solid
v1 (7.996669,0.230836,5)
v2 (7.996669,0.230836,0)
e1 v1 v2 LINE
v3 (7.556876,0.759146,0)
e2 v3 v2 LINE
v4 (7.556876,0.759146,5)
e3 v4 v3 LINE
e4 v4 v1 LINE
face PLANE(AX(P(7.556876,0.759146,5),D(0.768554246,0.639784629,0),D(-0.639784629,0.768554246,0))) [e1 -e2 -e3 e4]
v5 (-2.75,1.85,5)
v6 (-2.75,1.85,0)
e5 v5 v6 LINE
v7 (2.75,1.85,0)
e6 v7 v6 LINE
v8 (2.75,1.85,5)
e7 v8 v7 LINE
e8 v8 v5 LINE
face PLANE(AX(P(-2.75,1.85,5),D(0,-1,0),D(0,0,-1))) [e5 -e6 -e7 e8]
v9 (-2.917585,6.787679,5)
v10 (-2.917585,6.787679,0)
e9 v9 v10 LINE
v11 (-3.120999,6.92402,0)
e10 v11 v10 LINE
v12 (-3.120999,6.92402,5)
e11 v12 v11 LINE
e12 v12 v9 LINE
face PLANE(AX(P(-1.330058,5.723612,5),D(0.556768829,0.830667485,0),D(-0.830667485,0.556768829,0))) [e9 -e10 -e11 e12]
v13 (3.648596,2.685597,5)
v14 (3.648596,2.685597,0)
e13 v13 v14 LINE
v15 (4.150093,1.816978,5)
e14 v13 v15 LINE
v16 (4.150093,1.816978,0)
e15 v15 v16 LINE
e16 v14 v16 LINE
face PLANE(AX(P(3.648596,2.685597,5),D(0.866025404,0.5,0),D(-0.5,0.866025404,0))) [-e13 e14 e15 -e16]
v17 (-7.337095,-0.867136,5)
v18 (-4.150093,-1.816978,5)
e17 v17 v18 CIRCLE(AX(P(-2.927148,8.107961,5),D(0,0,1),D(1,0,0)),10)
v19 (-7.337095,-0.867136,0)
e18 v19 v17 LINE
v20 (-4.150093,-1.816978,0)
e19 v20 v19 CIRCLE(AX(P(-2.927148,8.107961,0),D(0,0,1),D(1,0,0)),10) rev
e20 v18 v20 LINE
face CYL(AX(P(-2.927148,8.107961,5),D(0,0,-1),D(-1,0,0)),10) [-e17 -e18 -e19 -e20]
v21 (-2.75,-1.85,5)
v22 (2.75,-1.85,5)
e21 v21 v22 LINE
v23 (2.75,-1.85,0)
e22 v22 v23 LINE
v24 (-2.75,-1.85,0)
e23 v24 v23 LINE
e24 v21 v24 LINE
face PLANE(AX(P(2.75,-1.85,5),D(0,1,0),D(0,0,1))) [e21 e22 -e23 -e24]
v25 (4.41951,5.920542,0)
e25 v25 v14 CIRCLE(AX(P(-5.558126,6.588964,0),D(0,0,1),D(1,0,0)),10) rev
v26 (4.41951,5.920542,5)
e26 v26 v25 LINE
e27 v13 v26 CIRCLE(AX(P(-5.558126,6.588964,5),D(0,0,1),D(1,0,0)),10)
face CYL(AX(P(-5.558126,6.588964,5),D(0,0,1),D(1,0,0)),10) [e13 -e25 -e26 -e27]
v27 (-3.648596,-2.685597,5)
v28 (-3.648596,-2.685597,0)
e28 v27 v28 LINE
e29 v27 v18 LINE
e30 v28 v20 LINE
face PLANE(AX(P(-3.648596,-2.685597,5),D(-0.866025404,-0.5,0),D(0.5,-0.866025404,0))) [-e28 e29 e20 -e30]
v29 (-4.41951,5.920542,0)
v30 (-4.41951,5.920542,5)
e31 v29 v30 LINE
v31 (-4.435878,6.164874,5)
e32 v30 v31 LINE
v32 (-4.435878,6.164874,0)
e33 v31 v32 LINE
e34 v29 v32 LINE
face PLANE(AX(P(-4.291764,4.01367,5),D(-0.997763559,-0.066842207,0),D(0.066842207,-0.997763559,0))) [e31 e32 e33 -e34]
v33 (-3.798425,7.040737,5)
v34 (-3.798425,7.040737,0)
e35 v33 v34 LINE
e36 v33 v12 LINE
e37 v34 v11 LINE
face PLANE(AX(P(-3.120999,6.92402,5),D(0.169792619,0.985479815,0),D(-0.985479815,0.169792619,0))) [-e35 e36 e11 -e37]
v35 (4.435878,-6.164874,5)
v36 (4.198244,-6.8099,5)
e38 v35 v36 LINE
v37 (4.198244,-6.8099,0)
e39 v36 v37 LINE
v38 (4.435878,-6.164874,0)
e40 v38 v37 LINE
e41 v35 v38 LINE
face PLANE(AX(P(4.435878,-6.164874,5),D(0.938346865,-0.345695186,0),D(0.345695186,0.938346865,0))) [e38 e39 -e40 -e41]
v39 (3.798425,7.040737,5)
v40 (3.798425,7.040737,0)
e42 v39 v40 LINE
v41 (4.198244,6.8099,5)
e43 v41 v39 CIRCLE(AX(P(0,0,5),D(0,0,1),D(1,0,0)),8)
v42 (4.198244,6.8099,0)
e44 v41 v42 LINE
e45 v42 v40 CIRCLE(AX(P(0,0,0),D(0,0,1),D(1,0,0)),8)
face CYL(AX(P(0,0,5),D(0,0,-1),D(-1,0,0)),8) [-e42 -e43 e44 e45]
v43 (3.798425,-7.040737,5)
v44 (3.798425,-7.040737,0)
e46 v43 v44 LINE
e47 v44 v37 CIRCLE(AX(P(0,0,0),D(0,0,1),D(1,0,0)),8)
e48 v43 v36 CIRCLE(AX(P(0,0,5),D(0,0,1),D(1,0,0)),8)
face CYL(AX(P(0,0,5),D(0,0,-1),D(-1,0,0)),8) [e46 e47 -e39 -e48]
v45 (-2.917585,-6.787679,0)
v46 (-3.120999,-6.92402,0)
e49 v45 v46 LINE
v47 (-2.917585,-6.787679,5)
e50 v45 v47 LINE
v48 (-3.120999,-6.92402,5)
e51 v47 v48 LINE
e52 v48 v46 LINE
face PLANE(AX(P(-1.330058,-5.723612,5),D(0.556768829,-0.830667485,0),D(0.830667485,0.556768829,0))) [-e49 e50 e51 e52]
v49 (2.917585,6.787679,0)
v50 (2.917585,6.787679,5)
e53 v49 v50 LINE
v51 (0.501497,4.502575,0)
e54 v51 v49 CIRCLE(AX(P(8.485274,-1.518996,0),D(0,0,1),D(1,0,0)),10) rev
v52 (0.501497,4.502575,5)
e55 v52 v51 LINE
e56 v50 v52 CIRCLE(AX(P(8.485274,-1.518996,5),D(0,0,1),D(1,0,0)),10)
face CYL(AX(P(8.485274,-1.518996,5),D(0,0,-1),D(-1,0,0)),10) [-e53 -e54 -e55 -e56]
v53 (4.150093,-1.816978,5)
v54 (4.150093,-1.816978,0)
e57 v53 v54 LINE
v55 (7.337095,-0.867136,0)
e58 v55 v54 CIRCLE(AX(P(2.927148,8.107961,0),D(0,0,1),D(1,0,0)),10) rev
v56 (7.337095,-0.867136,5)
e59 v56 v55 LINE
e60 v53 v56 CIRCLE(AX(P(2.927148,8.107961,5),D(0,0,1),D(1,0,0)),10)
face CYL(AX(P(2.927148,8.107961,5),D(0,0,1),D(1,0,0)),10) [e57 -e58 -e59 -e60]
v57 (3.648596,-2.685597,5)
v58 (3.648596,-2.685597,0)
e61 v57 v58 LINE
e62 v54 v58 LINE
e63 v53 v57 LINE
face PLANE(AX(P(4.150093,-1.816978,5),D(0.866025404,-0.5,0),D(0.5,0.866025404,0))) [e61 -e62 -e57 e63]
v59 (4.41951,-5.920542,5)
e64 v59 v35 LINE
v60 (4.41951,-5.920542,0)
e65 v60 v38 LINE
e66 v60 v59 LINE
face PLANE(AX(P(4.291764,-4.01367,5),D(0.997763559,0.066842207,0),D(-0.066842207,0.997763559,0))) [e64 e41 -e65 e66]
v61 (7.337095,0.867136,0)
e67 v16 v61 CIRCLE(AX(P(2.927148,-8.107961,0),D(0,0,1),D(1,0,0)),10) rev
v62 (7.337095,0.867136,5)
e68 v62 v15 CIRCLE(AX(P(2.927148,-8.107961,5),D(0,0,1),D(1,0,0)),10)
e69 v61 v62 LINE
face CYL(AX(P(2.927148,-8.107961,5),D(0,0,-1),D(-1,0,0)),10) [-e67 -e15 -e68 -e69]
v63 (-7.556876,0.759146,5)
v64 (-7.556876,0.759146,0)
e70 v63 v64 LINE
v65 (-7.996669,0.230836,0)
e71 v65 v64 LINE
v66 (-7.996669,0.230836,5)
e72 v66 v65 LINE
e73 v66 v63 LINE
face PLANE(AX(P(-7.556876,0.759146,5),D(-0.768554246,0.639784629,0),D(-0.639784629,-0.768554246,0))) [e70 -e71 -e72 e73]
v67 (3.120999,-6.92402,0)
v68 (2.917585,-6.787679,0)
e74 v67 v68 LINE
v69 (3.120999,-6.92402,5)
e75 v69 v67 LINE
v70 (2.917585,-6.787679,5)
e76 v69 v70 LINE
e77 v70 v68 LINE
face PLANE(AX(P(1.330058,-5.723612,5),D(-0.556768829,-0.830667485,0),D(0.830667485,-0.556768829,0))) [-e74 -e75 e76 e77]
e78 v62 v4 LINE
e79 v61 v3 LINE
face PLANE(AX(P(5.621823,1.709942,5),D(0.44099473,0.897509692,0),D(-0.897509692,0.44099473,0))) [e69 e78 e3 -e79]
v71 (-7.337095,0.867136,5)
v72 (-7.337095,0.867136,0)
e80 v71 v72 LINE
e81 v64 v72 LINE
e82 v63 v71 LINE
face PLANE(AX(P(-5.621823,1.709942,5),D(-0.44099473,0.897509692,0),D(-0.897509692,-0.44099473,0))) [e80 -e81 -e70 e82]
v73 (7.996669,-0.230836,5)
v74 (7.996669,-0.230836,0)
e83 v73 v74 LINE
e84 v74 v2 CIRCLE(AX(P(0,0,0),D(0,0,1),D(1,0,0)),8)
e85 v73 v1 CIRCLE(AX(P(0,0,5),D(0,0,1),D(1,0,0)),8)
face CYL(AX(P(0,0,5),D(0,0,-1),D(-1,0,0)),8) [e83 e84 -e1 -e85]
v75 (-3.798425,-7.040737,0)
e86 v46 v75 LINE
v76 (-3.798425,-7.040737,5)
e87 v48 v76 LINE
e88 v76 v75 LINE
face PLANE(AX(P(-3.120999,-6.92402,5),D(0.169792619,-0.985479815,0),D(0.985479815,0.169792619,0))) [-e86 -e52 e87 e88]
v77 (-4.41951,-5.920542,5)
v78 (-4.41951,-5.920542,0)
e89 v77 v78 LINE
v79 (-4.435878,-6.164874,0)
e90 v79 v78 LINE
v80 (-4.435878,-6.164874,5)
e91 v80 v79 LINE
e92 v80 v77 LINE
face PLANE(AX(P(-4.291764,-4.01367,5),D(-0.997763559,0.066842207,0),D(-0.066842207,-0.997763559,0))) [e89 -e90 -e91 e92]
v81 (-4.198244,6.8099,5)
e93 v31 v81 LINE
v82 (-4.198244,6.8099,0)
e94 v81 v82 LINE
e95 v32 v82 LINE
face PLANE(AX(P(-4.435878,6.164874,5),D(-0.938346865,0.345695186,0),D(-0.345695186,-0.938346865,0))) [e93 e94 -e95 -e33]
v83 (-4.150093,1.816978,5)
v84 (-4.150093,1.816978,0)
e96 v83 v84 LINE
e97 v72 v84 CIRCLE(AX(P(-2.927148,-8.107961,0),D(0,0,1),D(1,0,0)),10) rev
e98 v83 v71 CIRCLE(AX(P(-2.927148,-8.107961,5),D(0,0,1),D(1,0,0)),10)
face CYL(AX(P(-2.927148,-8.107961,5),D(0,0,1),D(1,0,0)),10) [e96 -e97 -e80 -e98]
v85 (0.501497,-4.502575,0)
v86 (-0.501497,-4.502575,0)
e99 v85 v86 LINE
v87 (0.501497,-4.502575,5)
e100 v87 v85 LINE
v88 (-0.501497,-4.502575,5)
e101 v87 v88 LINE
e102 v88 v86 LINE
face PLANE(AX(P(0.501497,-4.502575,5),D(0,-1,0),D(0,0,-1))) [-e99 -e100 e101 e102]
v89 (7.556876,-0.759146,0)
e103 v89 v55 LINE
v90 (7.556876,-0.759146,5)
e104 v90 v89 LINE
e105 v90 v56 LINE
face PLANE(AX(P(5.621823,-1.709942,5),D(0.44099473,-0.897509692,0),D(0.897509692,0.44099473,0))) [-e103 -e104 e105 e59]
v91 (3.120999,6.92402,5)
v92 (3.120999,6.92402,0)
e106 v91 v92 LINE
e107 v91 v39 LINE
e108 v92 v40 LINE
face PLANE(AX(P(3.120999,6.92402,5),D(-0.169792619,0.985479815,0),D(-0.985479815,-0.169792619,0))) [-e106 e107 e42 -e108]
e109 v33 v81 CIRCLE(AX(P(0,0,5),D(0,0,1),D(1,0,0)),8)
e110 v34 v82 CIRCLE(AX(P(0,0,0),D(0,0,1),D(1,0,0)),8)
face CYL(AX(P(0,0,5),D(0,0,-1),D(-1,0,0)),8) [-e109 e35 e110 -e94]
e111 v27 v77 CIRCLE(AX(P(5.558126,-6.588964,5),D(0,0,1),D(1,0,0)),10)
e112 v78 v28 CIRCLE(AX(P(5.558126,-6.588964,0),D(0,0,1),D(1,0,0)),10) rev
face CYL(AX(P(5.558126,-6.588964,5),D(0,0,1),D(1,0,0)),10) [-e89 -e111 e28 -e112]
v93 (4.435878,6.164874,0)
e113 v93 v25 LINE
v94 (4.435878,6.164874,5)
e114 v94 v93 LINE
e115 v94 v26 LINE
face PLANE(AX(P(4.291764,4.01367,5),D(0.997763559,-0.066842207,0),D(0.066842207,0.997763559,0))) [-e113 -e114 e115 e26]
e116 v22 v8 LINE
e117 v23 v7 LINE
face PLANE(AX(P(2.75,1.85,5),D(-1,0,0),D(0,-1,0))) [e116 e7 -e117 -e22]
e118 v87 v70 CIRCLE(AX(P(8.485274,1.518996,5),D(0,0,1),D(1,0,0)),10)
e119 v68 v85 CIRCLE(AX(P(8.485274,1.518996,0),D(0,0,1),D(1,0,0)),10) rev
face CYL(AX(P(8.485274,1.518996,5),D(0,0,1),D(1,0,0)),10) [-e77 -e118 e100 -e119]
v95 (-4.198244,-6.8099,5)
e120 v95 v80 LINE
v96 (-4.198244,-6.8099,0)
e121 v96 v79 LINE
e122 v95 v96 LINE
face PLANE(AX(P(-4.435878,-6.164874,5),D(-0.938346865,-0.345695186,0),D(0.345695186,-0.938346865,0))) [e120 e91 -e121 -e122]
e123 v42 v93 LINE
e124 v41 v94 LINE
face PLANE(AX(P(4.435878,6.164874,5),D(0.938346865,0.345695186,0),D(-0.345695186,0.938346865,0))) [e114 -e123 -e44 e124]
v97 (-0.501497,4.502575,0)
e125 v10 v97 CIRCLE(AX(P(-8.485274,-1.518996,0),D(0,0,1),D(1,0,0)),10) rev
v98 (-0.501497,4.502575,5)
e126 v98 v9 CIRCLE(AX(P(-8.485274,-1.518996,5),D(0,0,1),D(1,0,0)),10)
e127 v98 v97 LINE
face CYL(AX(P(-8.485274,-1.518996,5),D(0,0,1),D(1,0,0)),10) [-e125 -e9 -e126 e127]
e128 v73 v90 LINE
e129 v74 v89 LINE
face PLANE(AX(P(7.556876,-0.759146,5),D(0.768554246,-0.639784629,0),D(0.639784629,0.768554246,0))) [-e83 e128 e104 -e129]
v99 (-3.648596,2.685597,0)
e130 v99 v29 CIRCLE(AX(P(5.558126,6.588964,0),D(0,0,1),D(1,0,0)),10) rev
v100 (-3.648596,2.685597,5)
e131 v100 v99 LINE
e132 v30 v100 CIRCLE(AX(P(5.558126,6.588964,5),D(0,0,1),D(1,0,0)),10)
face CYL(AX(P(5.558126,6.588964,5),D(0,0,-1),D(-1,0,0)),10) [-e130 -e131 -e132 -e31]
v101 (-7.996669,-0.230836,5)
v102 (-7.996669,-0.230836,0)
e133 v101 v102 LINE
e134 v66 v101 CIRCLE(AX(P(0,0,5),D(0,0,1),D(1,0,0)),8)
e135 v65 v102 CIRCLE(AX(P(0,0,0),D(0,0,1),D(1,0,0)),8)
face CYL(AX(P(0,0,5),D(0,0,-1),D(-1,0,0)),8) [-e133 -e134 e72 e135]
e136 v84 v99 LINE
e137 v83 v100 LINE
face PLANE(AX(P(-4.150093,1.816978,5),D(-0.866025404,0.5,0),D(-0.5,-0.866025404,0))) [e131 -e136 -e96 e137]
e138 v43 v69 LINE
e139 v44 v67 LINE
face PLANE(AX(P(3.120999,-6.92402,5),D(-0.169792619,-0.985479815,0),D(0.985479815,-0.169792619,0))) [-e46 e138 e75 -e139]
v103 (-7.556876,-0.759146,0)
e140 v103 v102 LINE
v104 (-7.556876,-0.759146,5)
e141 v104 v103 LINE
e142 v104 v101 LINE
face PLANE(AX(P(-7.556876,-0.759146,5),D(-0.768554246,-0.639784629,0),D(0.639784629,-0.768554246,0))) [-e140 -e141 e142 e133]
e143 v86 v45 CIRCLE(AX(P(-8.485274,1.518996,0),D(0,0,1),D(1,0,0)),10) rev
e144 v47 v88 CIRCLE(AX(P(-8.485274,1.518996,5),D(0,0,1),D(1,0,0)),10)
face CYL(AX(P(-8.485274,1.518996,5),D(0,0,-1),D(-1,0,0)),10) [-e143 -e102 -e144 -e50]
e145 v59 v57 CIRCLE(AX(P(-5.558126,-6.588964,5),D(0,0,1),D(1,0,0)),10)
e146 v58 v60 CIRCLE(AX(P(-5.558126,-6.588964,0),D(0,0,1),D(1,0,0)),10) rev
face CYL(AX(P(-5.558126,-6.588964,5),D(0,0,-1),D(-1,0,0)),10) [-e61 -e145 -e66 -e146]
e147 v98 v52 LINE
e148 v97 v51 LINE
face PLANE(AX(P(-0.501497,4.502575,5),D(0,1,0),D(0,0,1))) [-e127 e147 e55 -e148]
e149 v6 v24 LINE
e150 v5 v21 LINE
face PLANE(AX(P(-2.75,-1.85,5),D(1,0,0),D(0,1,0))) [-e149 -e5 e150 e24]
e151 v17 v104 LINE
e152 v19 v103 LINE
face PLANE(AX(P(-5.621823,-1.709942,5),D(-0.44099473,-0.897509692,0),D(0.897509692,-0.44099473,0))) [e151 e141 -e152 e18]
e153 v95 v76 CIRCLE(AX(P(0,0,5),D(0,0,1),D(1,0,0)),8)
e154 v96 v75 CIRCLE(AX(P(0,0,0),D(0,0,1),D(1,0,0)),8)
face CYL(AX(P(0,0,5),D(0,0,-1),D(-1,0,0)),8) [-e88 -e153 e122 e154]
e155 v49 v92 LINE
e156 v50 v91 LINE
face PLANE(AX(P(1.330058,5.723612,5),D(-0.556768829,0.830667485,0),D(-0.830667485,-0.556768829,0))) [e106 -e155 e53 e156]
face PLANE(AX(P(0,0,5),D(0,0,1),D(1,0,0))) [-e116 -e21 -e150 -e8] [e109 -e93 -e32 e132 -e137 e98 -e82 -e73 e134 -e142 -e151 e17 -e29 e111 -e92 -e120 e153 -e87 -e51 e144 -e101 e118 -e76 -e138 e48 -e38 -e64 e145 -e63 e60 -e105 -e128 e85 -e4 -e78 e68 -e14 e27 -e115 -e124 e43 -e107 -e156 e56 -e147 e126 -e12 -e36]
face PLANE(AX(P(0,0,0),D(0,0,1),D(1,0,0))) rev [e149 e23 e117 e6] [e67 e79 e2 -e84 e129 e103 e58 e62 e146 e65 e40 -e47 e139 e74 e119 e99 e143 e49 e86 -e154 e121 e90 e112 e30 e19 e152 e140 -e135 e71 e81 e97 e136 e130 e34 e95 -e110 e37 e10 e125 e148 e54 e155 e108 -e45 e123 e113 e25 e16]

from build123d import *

# Parameters (mm, degrees)
SKETCH1_R           = 8
SKETCH1_W           = 5.5
SKETCH1_H           = 3.7
BOSS_EXTRUDE1_DEPTH = 5
CUT_EXTRUDE1_DEPTH  = 13.369316877
CIRPATTERN1_COUNT   = 6
FILLET1_R           = 10


with BuildPart() as part:
    # Sketch1 → Boss-Extrude1 (new body)
    with BuildSketch(Plane.XY):
        Circle(SKETCH1_R)
        Rectangle(SKETCH1_W, SKETCH1_H, mode=Mode.SUBTRACT)
    extrude(amount=BOSS_EXTRUDE1_DEPTH)

    # Sketch2 → Cut-Extrude1 (cut, through all)
    with BuildSketch(Plane.XY):
        Polygon((-7.331932906, 22.221764399), (0, 24.952212466), (7.331932906, 22.221764399), (3.798424573, 7.040736522), (3.120998591, 6.924019842), (1.330058439, 5.723612136), (0.501497444, 4.50257488), (-0.501497444, 4.50257488), (-1.330058439, 5.723612136), (-3.120998591, 6.924019842), (-3.798424573, 7.040736522), align=None)
    cut_extrude1 = extrude(amount=CUT_EXTRUDE1_DEPTH, mode=Mode.SUBTRACT)

    # CirPattern1: Cut-Extrude1 ×6 about axis
    cirpattern1_axis = Axis((0, 0, 0), (0, 0, 1))
    for i in range(1, CIRPATTERN1_COUNT):
        add(cut_extrude1.rotate(cirpattern1_axis, i * 360 / CIRPATTERN1_COUNT), mode=Mode.SUBTRACT)

    # Fillet1
    # the kernel refuses this fillet: 10 mm, written as the material it takes off along each edge
    with BuildSketch(Plane(origin=(-1.330058439, -5.723612136, -4.777865205), x_dir=(0.5615014183372642, 0.8274757743917586, 0), z_dir=(0, 0, 1)), Plane(origin=(5.621822731, 1.709941671, -4.777865205), x_dir=(-0.997365750808096, 0.07253660534518461, 0), z_dir=(0, 0, 1)), Plane(origin=(4.291764291, -4.013670465, -4.777865205), x_dir=(-0.43586433247083195, 0.9000123797369435, 0), z_dir=(0, 0, 1)), Plane(origin=(-5.621822731, -1.709941671, -4.777865205), x_dir=(0.997365750808096, -0.07253660534518423, 0), z_dir=(0, 0, 1)), Plane(origin=(-4.291764291, 4.013670465, -4.777865205), x_dir=(0.43586433247083256, -0.900012379736943, 0), z_dir=(0, 0, 1)), Plane(origin=(1.330058439, 5.723612136, -4.777865205), x_dir=(-0.561501418337264, -0.8274757743917588, 0), z_dir=(0, 0, 1))) as fillet1_piece_1:
        with BuildLine():
            CenterArc((1.975419419, 9.987502063), FILLET1_R, 247.992328485, 19.142820558)
            Line((-1.771887917, 0.716165173), (-1.846834064, 0.530738436))
            Line((-1.846834064, 0.530738436), (-0.074946147, -0.185426738))
            Line((-0.074946147, -0.185426738), (0, -0.2))
            ThreePointArc((0, -0.2), (0.737808461, -0.2), (1.465620873, -0.199750041))
            Line((1.465620873, -0.199750041), (1.475616922, 0))
        make_face()
    extrude(amount=14.55573041, mode=Mode.SUBTRACT)
    with BuildSketch(Plane(origin=(5.621822731, -1.709941671, -4.777865205), x_dir=(0.8975096924716217, 0.44099473003596645, 0), z_dir=(0, 0, 1)), Plane(origin=(1.330058439, -5.723612136, -4.777865205), x_dir=(0.8306674853820185, -0.5567688288052, 0), z_dir=(0, 0, 1)), Plane(origin=(-4.291764291, -4.013670465, -4.777865205), x_dir=(-0.06684220708960342, -0.9977635588411669, 0), z_dir=(0, 0, 1)), Plane(origin=(-5.621822731, 1.709941671, -4.777865205), x_dir=(-0.8975096924716216, -0.44099473003596684, 0), z_dir=(0, 0, 1)), Plane(origin=(4.291764291, 4.013670465, -4.777865205), x_dir=(0.06684220708960296, 0.9977635588411669, 0), z_dir=(0, 0, 1)), Plane(origin=(-1.330058439, 5.723612136, -4.777865205), x_dir=(-0.8306674853820185, 0.5567688288052001, 0), z_dir=(0, 0, 1))) as fillet1_piece_2:
        with BuildLine():
            CenterArc((1.911146082, 10), FILLET1_R, 250.857179442, 19.142820558)
            Line((-1.368094161, 0.552959012), (-1.433678966, 0.364018192))
            ThreePointArc((-1.433678966, 0.364018192), (-0.758993227, 0.091052768), (-0.074946147, -0.185426738))
            Line((-0.074946147, -0.185426738), (0, -0.2))
            Line((0, -0.2), (1.911146082, -0.2))
            Line((1.911146082, -0.2), (1.911146082, 0))
        make_face()
    extrude(amount=14.55573041, mode=Mode.SUBTRACT)


solid = part.part
